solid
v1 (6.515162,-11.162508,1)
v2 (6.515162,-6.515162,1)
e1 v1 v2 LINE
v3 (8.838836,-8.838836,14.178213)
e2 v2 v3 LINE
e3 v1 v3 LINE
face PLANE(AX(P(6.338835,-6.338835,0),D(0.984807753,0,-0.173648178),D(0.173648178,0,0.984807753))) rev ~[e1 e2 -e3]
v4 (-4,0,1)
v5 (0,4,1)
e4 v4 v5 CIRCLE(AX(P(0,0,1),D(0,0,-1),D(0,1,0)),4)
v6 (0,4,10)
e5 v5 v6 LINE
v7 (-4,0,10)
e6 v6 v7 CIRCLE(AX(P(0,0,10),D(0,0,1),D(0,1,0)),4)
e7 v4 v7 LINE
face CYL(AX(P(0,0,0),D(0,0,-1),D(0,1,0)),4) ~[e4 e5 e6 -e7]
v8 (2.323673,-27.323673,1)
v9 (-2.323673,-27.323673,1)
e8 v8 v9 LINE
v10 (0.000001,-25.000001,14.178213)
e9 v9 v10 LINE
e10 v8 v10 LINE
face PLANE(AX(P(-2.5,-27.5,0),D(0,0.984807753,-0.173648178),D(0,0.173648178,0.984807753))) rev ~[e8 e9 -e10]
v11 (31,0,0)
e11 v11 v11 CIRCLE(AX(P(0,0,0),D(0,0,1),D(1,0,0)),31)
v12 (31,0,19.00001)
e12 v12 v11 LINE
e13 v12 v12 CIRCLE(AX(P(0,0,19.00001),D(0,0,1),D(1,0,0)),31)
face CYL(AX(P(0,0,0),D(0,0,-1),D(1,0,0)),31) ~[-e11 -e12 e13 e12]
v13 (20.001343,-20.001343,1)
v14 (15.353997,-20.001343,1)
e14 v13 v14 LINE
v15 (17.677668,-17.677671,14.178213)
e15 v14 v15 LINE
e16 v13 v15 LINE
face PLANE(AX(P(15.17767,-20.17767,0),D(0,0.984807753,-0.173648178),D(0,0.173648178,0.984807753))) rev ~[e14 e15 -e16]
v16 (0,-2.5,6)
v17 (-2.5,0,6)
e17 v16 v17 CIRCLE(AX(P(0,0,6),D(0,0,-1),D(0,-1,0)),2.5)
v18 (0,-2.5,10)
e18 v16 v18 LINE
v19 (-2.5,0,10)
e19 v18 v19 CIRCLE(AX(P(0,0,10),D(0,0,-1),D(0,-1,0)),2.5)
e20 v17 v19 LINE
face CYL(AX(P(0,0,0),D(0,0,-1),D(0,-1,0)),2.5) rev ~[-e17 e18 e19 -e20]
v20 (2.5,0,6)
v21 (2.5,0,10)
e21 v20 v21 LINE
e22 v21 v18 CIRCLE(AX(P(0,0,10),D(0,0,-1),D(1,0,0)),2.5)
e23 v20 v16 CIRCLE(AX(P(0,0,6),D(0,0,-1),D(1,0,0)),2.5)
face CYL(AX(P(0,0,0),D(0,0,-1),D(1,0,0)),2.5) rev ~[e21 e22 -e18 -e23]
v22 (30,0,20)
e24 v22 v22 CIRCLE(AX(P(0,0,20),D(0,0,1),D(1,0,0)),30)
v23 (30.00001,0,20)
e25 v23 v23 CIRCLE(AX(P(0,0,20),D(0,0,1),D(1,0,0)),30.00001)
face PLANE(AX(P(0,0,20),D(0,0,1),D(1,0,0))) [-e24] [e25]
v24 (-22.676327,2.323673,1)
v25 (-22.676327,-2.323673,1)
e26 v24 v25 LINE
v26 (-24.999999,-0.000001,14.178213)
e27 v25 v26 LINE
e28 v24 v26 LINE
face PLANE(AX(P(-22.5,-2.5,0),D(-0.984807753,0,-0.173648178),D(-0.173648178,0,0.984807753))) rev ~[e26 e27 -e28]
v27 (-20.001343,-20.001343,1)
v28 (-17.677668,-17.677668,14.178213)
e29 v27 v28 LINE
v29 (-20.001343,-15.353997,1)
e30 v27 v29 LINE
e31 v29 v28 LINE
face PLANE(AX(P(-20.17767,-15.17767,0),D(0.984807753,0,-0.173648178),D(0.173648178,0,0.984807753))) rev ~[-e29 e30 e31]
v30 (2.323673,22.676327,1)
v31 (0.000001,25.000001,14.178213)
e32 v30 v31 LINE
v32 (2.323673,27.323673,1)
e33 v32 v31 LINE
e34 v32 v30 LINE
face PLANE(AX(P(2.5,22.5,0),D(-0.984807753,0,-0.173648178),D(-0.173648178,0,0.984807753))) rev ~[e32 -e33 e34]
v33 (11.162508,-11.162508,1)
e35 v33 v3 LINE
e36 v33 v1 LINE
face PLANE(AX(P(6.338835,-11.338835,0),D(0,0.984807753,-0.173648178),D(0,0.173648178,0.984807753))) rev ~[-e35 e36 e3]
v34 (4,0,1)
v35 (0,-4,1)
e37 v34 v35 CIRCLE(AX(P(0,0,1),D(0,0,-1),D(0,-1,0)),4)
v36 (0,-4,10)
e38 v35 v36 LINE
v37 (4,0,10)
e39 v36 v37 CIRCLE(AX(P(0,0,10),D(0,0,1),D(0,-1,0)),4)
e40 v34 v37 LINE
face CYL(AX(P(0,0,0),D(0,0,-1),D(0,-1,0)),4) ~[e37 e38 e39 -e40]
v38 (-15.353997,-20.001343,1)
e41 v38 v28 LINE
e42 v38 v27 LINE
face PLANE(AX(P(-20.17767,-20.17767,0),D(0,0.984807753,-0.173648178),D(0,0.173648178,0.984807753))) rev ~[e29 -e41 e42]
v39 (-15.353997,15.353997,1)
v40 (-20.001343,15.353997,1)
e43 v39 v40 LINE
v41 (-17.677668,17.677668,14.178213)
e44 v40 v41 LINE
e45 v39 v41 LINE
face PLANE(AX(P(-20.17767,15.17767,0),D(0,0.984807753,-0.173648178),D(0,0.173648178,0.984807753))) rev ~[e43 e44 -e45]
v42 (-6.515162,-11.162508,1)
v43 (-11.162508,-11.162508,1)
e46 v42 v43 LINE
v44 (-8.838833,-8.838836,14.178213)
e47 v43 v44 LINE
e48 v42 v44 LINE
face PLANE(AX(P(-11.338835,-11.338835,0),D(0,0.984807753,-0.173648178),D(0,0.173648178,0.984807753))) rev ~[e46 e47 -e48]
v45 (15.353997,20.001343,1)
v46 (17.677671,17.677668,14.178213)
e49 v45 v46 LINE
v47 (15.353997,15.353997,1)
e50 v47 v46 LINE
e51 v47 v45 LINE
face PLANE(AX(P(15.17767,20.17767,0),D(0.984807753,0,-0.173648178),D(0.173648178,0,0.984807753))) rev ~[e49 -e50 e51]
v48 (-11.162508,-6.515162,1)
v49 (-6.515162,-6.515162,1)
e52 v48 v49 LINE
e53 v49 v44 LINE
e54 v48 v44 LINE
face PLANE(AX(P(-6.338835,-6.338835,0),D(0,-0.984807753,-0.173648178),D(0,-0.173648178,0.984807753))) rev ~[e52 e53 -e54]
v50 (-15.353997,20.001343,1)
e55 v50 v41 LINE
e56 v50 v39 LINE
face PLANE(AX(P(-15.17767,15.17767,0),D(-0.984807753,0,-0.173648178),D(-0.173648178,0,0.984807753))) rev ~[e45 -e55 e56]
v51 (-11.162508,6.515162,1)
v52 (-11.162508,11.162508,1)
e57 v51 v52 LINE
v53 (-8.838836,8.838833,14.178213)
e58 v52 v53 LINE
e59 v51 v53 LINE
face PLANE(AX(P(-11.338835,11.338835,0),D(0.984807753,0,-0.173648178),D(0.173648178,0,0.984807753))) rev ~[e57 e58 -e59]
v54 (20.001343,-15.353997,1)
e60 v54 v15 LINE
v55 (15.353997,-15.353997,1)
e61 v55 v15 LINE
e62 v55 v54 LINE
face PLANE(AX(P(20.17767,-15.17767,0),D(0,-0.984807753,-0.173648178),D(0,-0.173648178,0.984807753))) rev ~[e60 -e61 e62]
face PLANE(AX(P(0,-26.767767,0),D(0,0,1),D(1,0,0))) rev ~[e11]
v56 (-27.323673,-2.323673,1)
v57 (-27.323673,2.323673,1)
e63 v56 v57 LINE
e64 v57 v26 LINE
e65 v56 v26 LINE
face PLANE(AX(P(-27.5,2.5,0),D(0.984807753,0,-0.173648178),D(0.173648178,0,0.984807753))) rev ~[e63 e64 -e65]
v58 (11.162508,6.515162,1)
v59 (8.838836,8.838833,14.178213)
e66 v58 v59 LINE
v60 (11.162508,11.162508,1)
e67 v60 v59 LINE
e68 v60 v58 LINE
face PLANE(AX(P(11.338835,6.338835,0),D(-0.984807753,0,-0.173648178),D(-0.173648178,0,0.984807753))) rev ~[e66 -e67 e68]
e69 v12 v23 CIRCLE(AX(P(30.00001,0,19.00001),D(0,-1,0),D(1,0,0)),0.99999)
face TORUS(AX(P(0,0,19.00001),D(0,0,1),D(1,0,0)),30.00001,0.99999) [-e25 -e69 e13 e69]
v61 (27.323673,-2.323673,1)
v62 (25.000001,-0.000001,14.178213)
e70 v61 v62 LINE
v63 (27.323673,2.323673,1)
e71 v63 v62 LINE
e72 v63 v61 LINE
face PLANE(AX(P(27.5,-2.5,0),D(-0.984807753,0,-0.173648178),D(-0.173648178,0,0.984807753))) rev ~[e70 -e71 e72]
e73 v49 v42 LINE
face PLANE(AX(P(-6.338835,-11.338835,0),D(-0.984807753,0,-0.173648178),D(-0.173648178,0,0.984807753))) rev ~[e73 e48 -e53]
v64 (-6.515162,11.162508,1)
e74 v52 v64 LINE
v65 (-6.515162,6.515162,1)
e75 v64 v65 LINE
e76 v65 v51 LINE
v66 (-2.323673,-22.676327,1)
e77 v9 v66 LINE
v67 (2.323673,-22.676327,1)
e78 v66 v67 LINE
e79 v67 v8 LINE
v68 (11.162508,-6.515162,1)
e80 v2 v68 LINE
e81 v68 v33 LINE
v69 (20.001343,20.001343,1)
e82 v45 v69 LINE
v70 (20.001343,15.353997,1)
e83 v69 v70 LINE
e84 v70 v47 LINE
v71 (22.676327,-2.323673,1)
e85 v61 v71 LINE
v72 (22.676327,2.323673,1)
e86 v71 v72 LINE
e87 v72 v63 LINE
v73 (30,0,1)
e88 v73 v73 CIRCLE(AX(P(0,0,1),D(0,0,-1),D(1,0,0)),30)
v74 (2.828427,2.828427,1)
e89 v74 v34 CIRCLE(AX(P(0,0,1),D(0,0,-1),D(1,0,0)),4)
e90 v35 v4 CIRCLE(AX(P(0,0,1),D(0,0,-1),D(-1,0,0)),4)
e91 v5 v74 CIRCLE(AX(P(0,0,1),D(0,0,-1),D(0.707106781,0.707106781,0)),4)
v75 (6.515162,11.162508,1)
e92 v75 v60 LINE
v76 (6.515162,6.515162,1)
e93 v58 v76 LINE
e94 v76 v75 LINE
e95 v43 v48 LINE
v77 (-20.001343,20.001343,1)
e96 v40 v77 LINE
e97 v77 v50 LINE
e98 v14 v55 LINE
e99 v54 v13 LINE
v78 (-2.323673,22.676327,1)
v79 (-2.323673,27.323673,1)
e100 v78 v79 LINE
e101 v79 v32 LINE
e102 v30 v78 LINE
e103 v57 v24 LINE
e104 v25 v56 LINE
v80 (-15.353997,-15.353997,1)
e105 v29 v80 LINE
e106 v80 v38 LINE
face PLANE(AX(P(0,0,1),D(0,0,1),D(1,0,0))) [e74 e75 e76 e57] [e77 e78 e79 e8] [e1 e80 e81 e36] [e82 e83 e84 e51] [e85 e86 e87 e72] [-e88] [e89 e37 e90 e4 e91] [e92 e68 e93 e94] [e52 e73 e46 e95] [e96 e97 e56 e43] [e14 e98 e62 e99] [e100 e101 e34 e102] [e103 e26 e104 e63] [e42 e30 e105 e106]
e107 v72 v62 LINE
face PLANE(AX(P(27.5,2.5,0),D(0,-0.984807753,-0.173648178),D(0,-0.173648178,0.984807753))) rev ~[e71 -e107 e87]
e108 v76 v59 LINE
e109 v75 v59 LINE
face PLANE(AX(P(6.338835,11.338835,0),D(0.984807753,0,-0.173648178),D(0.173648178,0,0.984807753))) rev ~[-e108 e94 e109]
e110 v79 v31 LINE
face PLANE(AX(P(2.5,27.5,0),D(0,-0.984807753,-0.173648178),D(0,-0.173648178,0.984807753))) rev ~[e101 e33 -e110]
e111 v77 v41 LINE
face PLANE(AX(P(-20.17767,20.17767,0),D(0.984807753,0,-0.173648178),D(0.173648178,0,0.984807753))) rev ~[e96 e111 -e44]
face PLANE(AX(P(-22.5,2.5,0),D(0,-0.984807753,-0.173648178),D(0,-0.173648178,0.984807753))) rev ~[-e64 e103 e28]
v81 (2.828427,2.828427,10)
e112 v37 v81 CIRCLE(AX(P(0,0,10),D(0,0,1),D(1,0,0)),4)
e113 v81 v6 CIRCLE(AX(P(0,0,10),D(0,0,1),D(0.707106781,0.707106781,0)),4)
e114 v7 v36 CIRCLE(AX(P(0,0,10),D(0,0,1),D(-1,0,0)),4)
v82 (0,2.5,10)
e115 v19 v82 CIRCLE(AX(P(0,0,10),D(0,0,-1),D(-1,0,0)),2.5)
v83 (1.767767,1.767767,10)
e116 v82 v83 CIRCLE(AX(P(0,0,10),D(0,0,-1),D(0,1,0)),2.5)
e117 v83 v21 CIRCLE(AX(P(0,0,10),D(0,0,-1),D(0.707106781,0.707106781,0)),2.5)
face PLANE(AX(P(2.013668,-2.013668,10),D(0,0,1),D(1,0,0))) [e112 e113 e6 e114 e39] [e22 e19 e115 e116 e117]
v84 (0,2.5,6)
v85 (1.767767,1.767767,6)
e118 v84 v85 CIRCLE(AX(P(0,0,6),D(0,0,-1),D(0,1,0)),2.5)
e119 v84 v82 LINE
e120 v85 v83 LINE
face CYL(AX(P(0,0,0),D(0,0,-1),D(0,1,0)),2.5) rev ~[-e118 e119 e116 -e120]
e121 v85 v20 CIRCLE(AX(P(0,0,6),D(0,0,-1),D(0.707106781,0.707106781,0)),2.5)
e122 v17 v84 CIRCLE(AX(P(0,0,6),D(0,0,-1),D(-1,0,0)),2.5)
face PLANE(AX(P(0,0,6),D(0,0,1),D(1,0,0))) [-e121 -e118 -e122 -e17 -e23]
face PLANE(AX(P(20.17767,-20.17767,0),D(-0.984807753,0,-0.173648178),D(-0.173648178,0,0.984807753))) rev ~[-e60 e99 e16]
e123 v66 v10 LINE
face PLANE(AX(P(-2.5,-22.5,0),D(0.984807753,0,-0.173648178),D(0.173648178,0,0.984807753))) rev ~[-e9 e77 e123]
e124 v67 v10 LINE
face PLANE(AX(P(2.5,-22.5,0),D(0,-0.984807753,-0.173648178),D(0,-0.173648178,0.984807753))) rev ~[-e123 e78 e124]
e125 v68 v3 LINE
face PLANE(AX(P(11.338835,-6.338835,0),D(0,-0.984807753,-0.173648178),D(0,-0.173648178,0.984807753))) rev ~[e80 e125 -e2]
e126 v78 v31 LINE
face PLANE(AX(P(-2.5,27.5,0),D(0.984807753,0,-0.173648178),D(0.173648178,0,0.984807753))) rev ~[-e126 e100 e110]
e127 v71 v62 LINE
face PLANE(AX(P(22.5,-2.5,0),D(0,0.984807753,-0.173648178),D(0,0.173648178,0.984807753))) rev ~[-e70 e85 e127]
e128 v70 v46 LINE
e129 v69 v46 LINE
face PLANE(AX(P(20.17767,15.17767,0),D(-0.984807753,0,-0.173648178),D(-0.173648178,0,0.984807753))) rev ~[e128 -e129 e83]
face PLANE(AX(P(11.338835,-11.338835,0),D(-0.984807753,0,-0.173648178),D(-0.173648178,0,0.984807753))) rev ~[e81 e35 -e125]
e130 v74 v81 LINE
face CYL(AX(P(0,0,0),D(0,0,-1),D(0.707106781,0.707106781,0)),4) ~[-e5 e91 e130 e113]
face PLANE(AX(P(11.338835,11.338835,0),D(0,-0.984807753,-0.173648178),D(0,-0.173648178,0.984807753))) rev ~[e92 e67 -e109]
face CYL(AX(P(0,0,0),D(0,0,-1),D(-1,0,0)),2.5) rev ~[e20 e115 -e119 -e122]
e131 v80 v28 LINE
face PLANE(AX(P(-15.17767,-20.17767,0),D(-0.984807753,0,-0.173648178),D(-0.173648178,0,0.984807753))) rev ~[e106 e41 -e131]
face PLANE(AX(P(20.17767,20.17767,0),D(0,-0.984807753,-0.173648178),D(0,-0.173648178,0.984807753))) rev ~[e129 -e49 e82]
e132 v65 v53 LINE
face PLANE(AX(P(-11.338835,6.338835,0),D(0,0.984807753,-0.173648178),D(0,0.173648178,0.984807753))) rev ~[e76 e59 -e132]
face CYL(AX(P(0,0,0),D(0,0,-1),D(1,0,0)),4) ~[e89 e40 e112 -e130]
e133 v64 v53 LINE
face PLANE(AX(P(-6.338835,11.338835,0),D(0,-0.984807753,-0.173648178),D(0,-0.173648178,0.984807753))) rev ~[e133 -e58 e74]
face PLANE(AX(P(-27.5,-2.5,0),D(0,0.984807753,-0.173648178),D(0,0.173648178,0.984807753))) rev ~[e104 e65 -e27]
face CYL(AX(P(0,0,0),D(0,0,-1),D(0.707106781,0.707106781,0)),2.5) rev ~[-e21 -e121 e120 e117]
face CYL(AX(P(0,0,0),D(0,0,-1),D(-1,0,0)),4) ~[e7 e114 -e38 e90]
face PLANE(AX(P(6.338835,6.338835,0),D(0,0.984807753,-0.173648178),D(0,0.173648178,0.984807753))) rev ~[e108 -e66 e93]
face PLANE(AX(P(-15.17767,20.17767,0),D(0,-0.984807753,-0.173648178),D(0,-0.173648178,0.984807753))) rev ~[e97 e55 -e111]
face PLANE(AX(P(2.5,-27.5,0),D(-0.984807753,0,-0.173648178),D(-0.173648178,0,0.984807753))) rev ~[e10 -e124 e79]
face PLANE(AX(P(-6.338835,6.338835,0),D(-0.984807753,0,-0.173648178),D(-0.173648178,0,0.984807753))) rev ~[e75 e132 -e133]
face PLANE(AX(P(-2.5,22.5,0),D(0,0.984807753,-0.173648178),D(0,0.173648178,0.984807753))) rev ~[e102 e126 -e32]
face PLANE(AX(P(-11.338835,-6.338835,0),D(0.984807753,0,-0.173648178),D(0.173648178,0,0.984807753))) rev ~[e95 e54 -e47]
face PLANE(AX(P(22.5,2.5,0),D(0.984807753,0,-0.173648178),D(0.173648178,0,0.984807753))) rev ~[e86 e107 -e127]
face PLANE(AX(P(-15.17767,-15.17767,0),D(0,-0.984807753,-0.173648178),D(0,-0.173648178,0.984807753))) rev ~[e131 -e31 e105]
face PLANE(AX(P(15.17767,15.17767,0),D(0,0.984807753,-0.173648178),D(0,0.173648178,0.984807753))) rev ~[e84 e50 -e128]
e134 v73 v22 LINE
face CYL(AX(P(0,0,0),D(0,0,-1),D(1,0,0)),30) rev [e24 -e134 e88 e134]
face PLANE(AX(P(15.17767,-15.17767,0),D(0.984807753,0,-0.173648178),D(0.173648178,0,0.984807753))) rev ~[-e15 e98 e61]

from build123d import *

# Parameters (mm, degrees)
F0_R     = 31
F0_R_2   = 30
F0_W     = 5
F0_H     = 5
F1_DEPTH = 1
F2_DEPTH = 20
F3_DEPTH = 10
F4_DEPTH = 15
F4_TAPER = 10
F5_R     = 0.99999
F6_DEPTH = 5


# Not quite as in the source:
# - a fillet or chamfer is up to 0.001 mm smaller than in the source, because OpenCascade refuses the exact size


with BuildPart() as f1:
    # F0 (on Top) → F1 (new body)
    with BuildSketch(Plane.XY):
        Circle(F0_R)
        Circle(F0_R_2, mode=Mode.SUBTRACT)
        Circle(F0_R_2)
        with Locations((-17.6776695297, -17.6776695297)):
            Rectangle(F0_W, F0_H, mode=Mode.SUBTRACT)
        Polygon((-2.5, -22.5), (0, -22.5), (2.5, -22.5), (2.5, -27.5), (-2.5, -27.5), align=None, mode=Mode.SUBTRACT)
        with Locations((17.6776695297, -17.6776695297)):
            Rectangle(F0_W, F0_H, mode=Mode.SUBTRACT)
        Polygon((-22.5, 2.5), (-22.5, 0), (-22.5, -2.5), (-27.5, -2.5), (-27.5, 2.5), align=None, mode=Mode.SUBTRACT)
        with Locations((-17.6776695297, 17.6776695297)):
            Rectangle(F0_W, F0_H, mode=Mode.SUBTRACT)
        with BuildLine():
            ThreePointArc((-15.1776695297, 15.1776695297), (-8.2140955588, 19.8305809006), (0, 21.4644660941))
            ThreePointArc((0, 21.4644660941), (8.2140955588, 19.8305809006), (15.1776695297, 15.1776695297))
            ThreePointArc((15.1776695297, 15.1776695297), (19.8305809006, 8.2140955588), (21.4644660941, 0))
            ThreePointArc((21.4644660941, 0), (19.8305809006, -8.2140955588), (15.1776695297, -15.1776695297))
            ThreePointArc((15.1776695297, -15.1776695297), (8.2140955588, -19.8305809006), (0, -21.4644660941))
            ThreePointArc((0, -21.4644660941), (-8.2140955588, -19.8305809006), (-15.1776695297, -15.1776695297))
            ThreePointArc((-15.1776695297, -15.1776695297), (-19.8305809006, -8.2140955588), (-21.4644660941, 0))
            ThreePointArc((-21.4644660941, 0), (-19.8305809006, 8.2140955588), (-15.1776695297, 15.1776695297))
        make_face(mode=Mode.SUBTRACT)
        Polygon((22.5, -2.5), (22.5, 0), (22.5, 2.5), (27.5, 2.5), (27.5, -2.5), align=None, mode=Mode.SUBTRACT)
        Polygon((2.5, 22.5), (0, 22.5), (-2.5, 22.5), (-2.5, 27.5), (2.5, 27.5), align=None, mode=Mode.SUBTRACT)
        with Locations((17.6776695297, 17.6776695297)):
            Rectangle(F0_W, F0_H, mode=Mode.SUBTRACT)
        with BuildLine():
            Line((0, 21.4644660941), (0, 12.5))
            ThreePointArc((0, 12.5), (3.2848701936, 12.0606644847), (6.3388347648, 10.7735404498))
            Line((6.3388347648, 10.7735404498), (6.3388347648, 11.3388347648))
            Line((6.3388347648, 11.3388347648), (11.3388347648, 11.3388347648))
            Line((11.3388347648, 11.3388347648), (15.1776695297, 15.1776695297))
            ThreePointArc((15.1776695297, 15.1776695297), (8.2140955588, 19.8305809006), (0, 21.4644660941))
        make_face()
        with BuildLine():
            ThreePointArc((10.7735404498, 6.3388347648), (12.0606644847, 3.2848701936), (12.5, 0))
            Line((12.5, 0), (21.4644660941, 0))
            ThreePointArc((21.4644660941, 0), (19.8305809006, 8.2140955588), (15.1776695297, 15.1776695297))
            Line((15.1776695297, 15.1776695297), (11.3388347648, 11.3388347648))
            Line((11.3388347648, 11.3388347648), (11.3388347648, 6.3388347648))
            Line((11.3388347648, 6.3388347648), (10.7735404498, 6.3388347648))
        make_face()
        with BuildLine():
            ThreePointArc((6.3388347648, -10.7735404498), (3.2848701936, -12.0606644847), (0, -12.5))
            Line((0, -12.5), (0, -21.4644660941))
            ThreePointArc((0, -21.4644660941), (8.2140955588, -19.8305809006), (15.1776695297, -15.1776695297))
            ThreePointArc((15.1776695297, -15.1776695297), (19.8305809006, -8.2140955588), (21.4644660941, 0))
            Line((21.4644660941, 0), (12.5, 0))
            ThreePointArc((12.5, 0), (12.0606644847, -3.2848701936), (10.7735404498, -6.3388347648))
            Line((10.7735404498, -6.3388347648), (11.3388347648, -6.3388347648))
            Line((11.3388347648, -6.3388347648), (11.3388347648, -11.3388347648))
            Line((11.3388347648, -11.3388347648), (6.3388347648, -11.3388347648))
            Line((6.3388347648, -11.3388347648), (6.3388347648, -10.7735404498))
        make_face()
        with BuildLine():
            Line((0, -21.4644660941), (0, -12.5))
            ThreePointArc((0, -12.5), (-3.2848701936, -12.0606644847), (-6.3388347648, -10.7735404498))
            Line((-6.3388347648, -10.7735404498), (-6.3388347648, -11.3388347648))
            Line((-6.3388347648, -11.3388347648), (-11.3388347648, -11.3388347648))
            Line((-11.3388347648, -11.3388347648), (-11.3388347648, -6.3388347648))
            Line((-11.3388347648, -6.3388347648), (-10.7735404498, -6.3388347648))
            ThreePointArc((-10.7735404498, -6.3388347648), (-12.0606644847, -3.2848701936), (-12.5, 0))
            Line((-12.5, 0), (-21.4644660941, 0))
            ThreePointArc((-21.4644660941, 0), (-19.8305809006, -8.2140955588), (-15.1776695297, -15.1776695297))
            ThreePointArc((-15.1776695297, -15.1776695297), (-8.2140955588, -19.8305809006), (0, -21.4644660941))
        make_face()
        with BuildLine():
            ThreePointArc((-6.3388347648, 10.7735404498), (-3.2848701936, 12.0606644847), (0, 12.5))
            Line((0, 12.5), (0, 21.4644660941))
            ThreePointArc((0, 21.4644660941), (-8.2140955588, 19.8305809006), (-15.1776695297, 15.1776695297))
            ThreePointArc((-15.1776695297, 15.1776695297), (-19.8305809006, 8.2140955588), (-21.4644660941, 0))
            Line((-21.4644660941, 0), (-12.5, 0))
            ThreePointArc((-12.5, 0), (-12.0606644847, 3.2848701936), (-10.7735404498, 6.3388347648))
            Line((-10.7735404498, 6.3388347648), (-11.3388347648, 6.3388347648))
            Line((-11.3388347648, 6.3388347648), (-11.3388347648, 11.3388347648))
            Line((-11.3388347648, 11.3388347648), (-6.3388347648, 11.3388347648))
            Line((-6.3388347648, 11.3388347648), (-6.3388347648, 10.7735404498))
        make_face()
        with BuildLine():
            Line((0, 12.5), (0, 4))
            ThreePointArc((0, 4), (1.5307337295, 3.69551813), (2.8284271247, 2.8284271247))
            Line((2.8284271247, 2.8284271247), (6.3388347648, 6.3388347648))
            Line((6.3388347648, 6.3388347648), (6.3388347648, 10.7735404498))
            ThreePointArc((6.3388347648, 10.7735404498), (3.2848701936, 12.0606644847), (0, 12.5))
        make_face()
        with BuildLine():
            ThreePointArc((-4, 0), (-2.8284271247, 2.8284271247), (0, 4))
            Line((0, 4), (0, 12.5))
            ThreePointArc((0, 12.5), (-3.2848701936, 12.0606644847), (-6.3388347648, 10.7735404498))
            Line((-6.3388347648, 10.7735404498), (-6.3388347648, 6.3388347648))
            Line((-6.3388347648, 6.3388347648), (-10.7735404498, 6.3388347648))
            ThreePointArc((-10.7735404498, 6.3388347648), (-12.0606644847, 3.2848701936), (-12.5, 0))
            Line((-12.5, 0), (-4, 0))
        make_face()
        with BuildLine():
            ThreePointArc((2.8284271247, 2.8284271247), (3.69551813, 1.5307337295), (4, 0))
            Line((4, 0), (12.5, 0))
            ThreePointArc((12.5, 0), (12.0606644847, 3.2848701936), (10.7735404498, 6.3388347648))
            Line((10.7735404498, 6.3388347648), (6.3388347648, 6.3388347648))
            Line((6.3388347648, 6.3388347648), (2.8284271247, 2.8284271247))
        make_face()
        with BuildLine():
            ThreePointArc((4, 0), (2.8284271247, -2.8284271247), (0, -4))
            Line((0, -4), (0, -12.5))
            ThreePointArc((0, -12.5), (3.2848701936, -12.0606644847), (6.3388347648, -10.7735404498))
            Line((6.3388347648, -10.7735404498), (6.3388347648, -6.3388347648))
            Line((6.3388347648, -6.3388347648), (10.7735404498, -6.3388347648))
            ThreePointArc((10.7735404498, -6.3388347648), (12.0606644847, -3.2848701936), (12.5, 0))
            Line((12.5, 0), (4, 0))
        make_face()
        with BuildLine():
            Line((0, -12.5), (0, -4))
            ThreePointArc((0, -4), (-2.8284271247, -2.8284271247), (-4, 0))
            Line((-4, 0), (-12.5, 0))
            ThreePointArc((-12.5, 0), (-12.0606644847, -3.2848701936), (-10.7735404498, -6.3388347648))
            Line((-10.7735404498, -6.3388347648), (-6.3388347648, -6.3388347648))
            Line((-6.3388347648, -6.3388347648), (-6.3388347648, -10.7735404498))
            ThreePointArc((-6.3388347648, -10.7735404498), (-3.2848701936, -12.0606644847), (0, -12.5))
        make_face()
        Polygon((22.5, 2.5), (25, 0), (27.5, 2.5), align=None)
        Polygon((27.5, 2.5), (25, 0), (27.5, -2.5), align=None)
        Polygon((27.5, -2.5), (25, 0), (22.5, -2.5), align=None)
        Polygon((25, 0), (22.5, 0), (22.5, -2.5), align=None)
        Polygon((22.5, 2.5), (22.5, 0), (25, 0), align=None)
        Polygon((17.6776695297, 17.6776695297), (15.1776695297, 15.1776695297), (20.1776695297, 15.1776695297), align=None)
        Polygon((15.1776695297, 20.1776695297), (17.6776695297, 17.6776695297), (20.1776695297, 20.1776695297), align=None)
        Polygon((20.1776695297, 20.1776695297), (17.6776695297, 17.6776695297), (20.1776695297, 15.1776695297), align=None)
        Polygon((15.1776695297, 20.1776695297), (15.1776695297, 15.1776695297), (17.6776695297, 17.6776695297), align=None)
        Polygon((-2.5, 27.5), (0, 25), (2.5, 27.5), align=None)
        Polygon((2.5, 27.5), (0, 25), (2.5, 22.5), align=None)
        Polygon((-2.5, 22.5), (0, 22.5), (0, 25), align=None)
        Polygon((0, 25), (0, 22.5), (2.5, 22.5), align=None)
        Polygon((-2.5, 22.5), (0, 25), (-2.5, 27.5), align=None)
        Polygon((-17.6776695297, 17.6776695297), (-15.1776695297, 20.1776695297), (-20.1776695297, 20.1776695297), align=None)
        Polygon((-17.6776695297, 17.6776695297), (-15.1776695297, 15.1776695297), (-15.1776695297, 20.1776695297), align=None)
        Polygon((-20.1776695297, 15.1776695297), (-15.1776695297, 15.1776695297), (-17.6776695297, 17.6776695297), align=None)
        Polygon((-20.1776695297, 20.1776695297), (-20.1776695297, 15.1776695297), (-17.6776695297, 17.6776695297), align=None)
        Polygon((-8.8388347762, 8.8388347535), (-6.3388347648, 11.3388347648), (-11.3388347648, 11.3388347648), align=None)
        Polygon((-11.3388347648, 6.3388347648), (-8.8388347762, 8.8388347535), (-11.3388347648, 11.3388347648), align=None)
        with BuildLine():
            ThreePointArc((-8.8388347762, 8.8388347535), (-9.8855356702, 7.650240814), (-10.7735404498, 6.3388347648))
            Line((-10.7735404498, 6.3388347648), (-6.3388347648, 6.3388347648))
            Line((-6.3388347648, 6.3388347648), (-8.8388347648, 8.8388347648))
        make_face()
        with BuildLine():
            Line((-6.3388347648, 6.3388347648), (-6.3388347648, 10.7735404498))
            ThreePointArc((-6.3388347648, 10.7735404498), (-7.6502408267, 9.8855356604), (-8.8388347762, 8.8388347535))
            Line((-8.8388347648, 8.8388347648), (-6.3388347648, 6.3388347648))
        make_face()
        with BuildLine():
            Line((6.3388347648, 10.7735404498), (6.3388347648, 6.3388347648))
            Line((6.3388347648, 6.3388347648), (8.8388347648, 8.8388347648))
            ThreePointArc((8.8388347535, 8.8388347762), (7.650240814, 9.8855356702), (6.3388347648, 10.7735404498))
        make_face()
        Polygon((6.3388347648, 11.3388347648), (8.8388347535, 8.8388347762), (11.3388347648, 11.3388347648), align=None)
        Polygon((11.3388347648, 11.3388347648), (8.8388347648, 8.8388347648), (11.3388347648, 6.3388347648), align=None)
        with BuildLine():
            Line((8.8388347648, 8.8388347648), (6.3388347648, 6.3388347648))
            Line((6.3388347648, 6.3388347648), (10.7735404498, 6.3388347648))
            ThreePointArc((10.7735404498, 6.3388347648), (9.8855356604, 7.6502408267), (8.8388347535, 8.8388347762))
        make_face()
        with BuildLine():
            ThreePointArc((8.8388347578, -8.8388347719), (9.8855356623, -7.6502408243), (10.7735404498, -6.3388347648))
            Line((10.7735404498, -6.3388347648), (6.3388347648, -6.3388347648))
            Line((6.3388347648, -6.3388347648), (8.8388347648, -8.8388347648))
        make_face()
        Polygon((11.3388347648, -6.3388347648), (8.8388347578, -8.8388347719), (11.3388347648, -11.3388347648), align=None)
        Polygon((8.8388347578, -8.8388347719), (6.3388347648, -11.3388347648), (11.3388347648, -11.3388347648), align=None)
        with BuildLine():
            Line((6.3388347648, -6.3388347648), (6.3388347648, -10.7735404498))
            ThreePointArc((6.3388347648, -10.7735404498), (7.6502408164, -9.8855356684), (8.8388347578, -8.8388347719))
            Line((8.8388347648, -8.8388347648), (6.3388347648, -6.3388347648))
        make_face()
        with BuildLine():
            Line((-6.3388347648, -6.3388347648), (-10.7735404498, -6.3388347648))
            ThreePointArc((-10.7735404498, -6.3388347648), (-9.8855356524, -7.650240837), (-8.838834735, -8.8388347946))
            Line((-8.8388347648, -8.8388347648), (-6.3388347648, -6.3388347648))
        make_face()
        with BuildLine():
            ThreePointArc((-8.838834735, -8.8388347946), (-7.6502408037, -9.8855356782), (-6.3388347648, -10.7735404498))
            Line((-6.3388347648, -10.7735404498), (-6.3388347648, -6.3388347648))
            Line((-6.3388347648, -6.3388347648), (-8.8388347648, -8.8388347648))
        make_face()
        Polygon((-11.3388347648, -11.3388347648), (-6.3388347648, -11.3388347648), (-8.838834735, -8.8388347946), align=None)
        Polygon((-27.5, 2.5), (-25, 0), (-22.5, 2.5), align=None)
        Polygon((-25, 0), (-22.5, 0), (-22.5, 2.5), align=None)
        Polygon((-22.5, -2.5), (-22.5, 0), (-25, 0), align=None)
        Polygon((-22.5, -2.5), (-25, 0), (-27.5, -2.5), align=None)
        Polygon((-27.5, -2.5), (-25, 0), (-27.5, 2.5), align=None)
        with BuildLine():
            ThreePointArc((-2.5, 0), (-1.767766953, 1.767766953), (0, 2.5))
            Line((0, 2.5), (0, 4))
            ThreePointArc((0, 4), (-2.8284271247, 2.8284271247), (-4, 0))
            Line((-4, 0), (-2.5, 0))
        make_face()
        with BuildLine():
            ThreePointArc((2.5, 0), (1.767766953, -1.767766953), (0, -2.5))
            Line((0, -2.5), (0, -4))
            ThreePointArc((0, -4), (2.8284271247, -2.8284271247), (4, 0))
            Line((4, 0), (2.5, 0))
        make_face()
        with BuildLine():
            Line((0, -4), (0, -2.5))
            ThreePointArc((0, -2.5), (-1.767766953, -1.767766953), (-2.5, 0))
            Line((-2.5, 0), (-4, 0))
            ThreePointArc((-4, 0), (-2.8284271247, -2.8284271247), (0, -4))
        make_face()
        with BuildLine():
            ThreePointArc((1.767766953, 1.767766953), (2.3096988313, 0.9567085809), (2.5, 0))
            Line((2.5, 0), (4, 0))
            ThreePointArc((4, 0), (3.69551813, 1.5307337295), (2.8284271247, 2.8284271247))
            Line((2.8284271247, 2.8284271247), (1.767766953, 1.767766953))
        make_face()
        with BuildLine():
            Line((0, 4), (0, 2.5))
            ThreePointArc((0, 2.5), (0.9567085809, 2.3096988313), (1.767766953, 1.767766953))
            Line((1.767766953, 1.767766953), (2.8284271247, 2.8284271247))
            ThreePointArc((2.8284271247, 2.8284271247), (1.5307337295, 3.69551813), (0, 4))
        make_face()
        Polygon((-11.3388347648, -11.3388347648), (-8.8388347648, -8.8388347648), (-11.3388347648, -6.3388347648), align=None)
        Polygon((-17.6776695297, -17.6776695297), (-15.1776695297, -15.1776695297), (-20.1776695297, -15.1776695297), align=None)
        Polygon((-15.1776695297, -20.1776695297), (-15.1776695297, -15.1776695297), (-17.6776695297, -17.6776695297), align=None)
        Polygon((-20.1776695297, -20.1776695297), (-15.1776695297, -20.1776695297), (-17.6776695297, -17.6776695297), align=None)
        Polygon((-17.6776695297, -17.6776695297), (-20.1776695297, -15.1776695297), (-20.1776695297, -20.1776695297), align=None)
        Polygon((20.1776695297, -15.1776695297), (15.1776695297, -15.1776695297), (17.6776695297, -17.6776695297), align=None)
        Polygon((20.1776695297, -20.1776695297), (20.1776695297, -15.1776695297), (17.6776695297, -17.6776695297), align=None)
        Polygon((17.6776695297, -17.6776695297), (15.1776695297, -20.1776695297), (20.1776695297, -20.1776695297), align=None)
        Polygon((17.6776695297, -17.6776695297), (15.1776695297, -15.1776695297), (15.1776695297, -20.1776695297), align=None)
        Polygon((2.5, -22.5), (0, -25), (2.5, -27.5), align=None)
        Polygon((2.5, -27.5), (0, -25), (-2.5, -27.5), align=None)
        Polygon((-2.5, -27.5), (0, -25), (-2.5, -22.5), align=None)
        Polygon((0, -25), (0, -22.5), (-2.5, -22.5), align=None)
        Polygon((2.5, -22.5), (0, -22.5), (0, -25), align=None)
        with BuildLine():
            Line((11.3388347648, -6.3388347648), (10.7735404498, -6.3388347648))
            ThreePointArc((10.7735404498, -6.3388347648), (9.8855356623, -7.6502408243), (8.8388347578, -8.8388347719))
            Line((8.8388347578, -8.8388347719), (11.3388347648, -6.3388347648))
        make_face()
        with BuildLine():
            ThreePointArc((8.8388347578, -8.8388347719), (7.6502408164, -9.8855356684), (6.3388347648, -10.7735404498))
            Line((6.3388347648, -10.7735404498), (6.3388347648, -11.3388347648))
            Line((6.3388347648, -11.3388347648), (8.8388347578, -8.8388347719))
        make_face()
        with BuildLine():
            Line((-6.3388347648, -11.3388347648), (-6.3388347648, -10.7735404498))
            ThreePointArc((-6.3388347648, -10.7735404498), (-7.6502408037, -9.8855356782), (-8.838834735, -8.8388347946))
            Line((-8.838834735, -8.8388347946), (-6.3388347648, -11.3388347648))
        make_face()
        with BuildLine():
            ThreePointArc((-8.838834735, -8.8388347946), (-9.8855356524, -7.650240837), (-10.7735404498, -6.3388347648))
            Line((-10.7735404498, -6.3388347648), (-11.3388347648, -6.3388347648))
            Line((-11.3388347648, -6.3388347648), (-8.838834735, -8.8388347946))
        make_face()
        with BuildLine():
            ThreePointArc((8.8388347535, 8.8388347762), (9.8855356604, 7.6502408267), (10.7735404498, 6.3388347648))
            Line((10.7735404498, 6.3388347648), (11.3388347648, 6.3388347648))
            Line((11.3388347648, 6.3388347648), (8.8388347535, 8.8388347762))
        make_face()
        with BuildLine():
            Line((6.3388347648, 11.3388347648), (6.3388347648, 10.7735404498))
            ThreePointArc((6.3388347648, 10.7735404498), (7.650240814, 9.8855356702), (8.8388347535, 8.8388347762))
            Line((8.8388347535, 8.8388347762), (6.3388347648, 11.3388347648))
        make_face()
        with BuildLine():
            ThreePointArc((-8.8388347762, 8.8388347535), (-7.6502408267, 9.8855356604), (-6.3388347648, 10.7735404498))
            Line((-6.3388347648, 10.7735404498), (-6.3388347648, 11.3388347648))
            Line((-6.3388347648, 11.3388347648), (-8.8388347762, 8.8388347535))
        make_face()
        with BuildLine():
            Line((-11.3388347648, 6.3388347648), (-10.7735404498, 6.3388347648))
            ThreePointArc((-10.7735404498, 6.3388347648), (-9.8855356702, 7.650240814), (-8.8388347762, 8.8388347535))
            Line((-8.8388347762, 8.8388347535), (-11.3388347648, 6.3388347648))
        make_face()
        with BuildLine():
            Line((0, 2.5), (0, 0))
            Line((0, 0), (1.767766953, 1.767766953))
            ThreePointArc((1.767766953, 1.767766953), (0.9567085809, 2.3096988313), (0, 2.5))
        make_face()
        with BuildLine():
            Line((1.767766953, 1.767766953), (0, 0))
            Line((0, 0), (2.5, 0))
            ThreePointArc((2.5, 0), (2.3096988313, 0.9567085809), (1.767766953, 1.767766953))
        make_face()
        with BuildLine():
            Line((2.5, 0), (0, 0))
            Line((0, 0), (0, -2.5))
            ThreePointArc((0, -2.5), (1.767766953, -1.767766953), (2.5, 0))
        make_face()
        with BuildLine():
            Line((0, -2.5), (0, 0))
            Line((0, 0), (-2.5, 0))
            ThreePointArc((-2.5, 0), (-1.767766953, -1.767766953), (0, -2.5))
        make_face()
        with BuildLine():
            Line((-2.5, 0), (0, 0))
            Line((0, 0), (0, 2.5))
            ThreePointArc((0, 2.5), (-1.767766953, 1.767766953), (-2.5, 0))
        make_face()
    extrude(amount=F1_DEPTH)

    # F0 (on Top) → F2 (join)
    with BuildSketch(Plane.XY):
        Circle(F0_R)
        Circle(F0_R_2, mode=Mode.SUBTRACT)
    extrude(amount=F2_DEPTH)

    # F0 (on Top) → F3 (join)
    with BuildSketch(Plane.XY):
        with BuildLine():
            ThreePointArc((2.5, 0), (1.767766953, -1.767766953), (0, -2.5))
            Line((0, -2.5), (0, -4))
            ThreePointArc((0, -4), (2.8284271247, -2.8284271247), (4, 0))
            Line((4, 0), (2.5, 0))
        make_face()
        with BuildLine():
            ThreePointArc((1.767766953, 1.767766953), (2.3096988313, 0.9567085809), (2.5, 0))
            Line((2.5, 0), (4, 0))
            ThreePointArc((4, 0), (3.69551813, 1.5307337295), (2.8284271247, 2.8284271247))
            Line((2.8284271247, 2.8284271247), (1.767766953, 1.767766953))
        make_face()
        with BuildLine():
            Line((0, 4), (0, 2.5))
            ThreePointArc((0, 2.5), (0.9567085809, 2.3096988313), (1.767766953, 1.767766953))
            Line((1.767766953, 1.767766953), (2.8284271247, 2.8284271247))
            ThreePointArc((2.8284271247, 2.8284271247), (1.5307337295, 3.69551813), (0, 4))
        make_face()
        with BuildLine():
            ThreePointArc((-2.5, 0), (-1.767766953, 1.767766953), (0, 2.5))
            Line((0, 2.5), (0, 4))
            ThreePointArc((0, 4), (-2.8284271247, 2.8284271247), (-4, 0))
            Line((-4, 0), (-2.5, 0))
        make_face()
        with BuildLine():
            Line((0, -4), (0, -2.5))
            ThreePointArc((0, -2.5), (-1.767766953, -1.767766953), (-2.5, 0))
            Line((-2.5, 0), (-4, 0))
            ThreePointArc((-4, 0), (-2.8284271247, -2.8284271247), (0, -4))
        make_face()
    extrude(amount=F3_DEPTH)

    # F0 (on Top) → F4 (join)
    with BuildSketch(Plane.XY):
        Polygon((2.5, -27.5), (0, -25), (-2.5, -27.5), align=None)
        Polygon((2.5, -22.5), (0, -25), (2.5, -27.5), align=None)
        Polygon((2.5, -22.5), (0, -22.5), (0, -25), align=None)
        Polygon((0, -25), (0, -22.5), (-2.5, -22.5), align=None)
        Polygon((-2.5, -27.5), (0, -25), (-2.5, -22.5), align=None)
        Polygon((17.6776695297, -17.6776695297), (15.1776695297, -15.1776695297), (15.1776695297, -20.1776695297), align=None)
        Polygon((17.6776695297, -17.6776695297), (15.1776695297, -20.1776695297), (20.1776695297, -20.1776695297), align=None)
        Polygon((20.1776695297, -20.1776695297), (20.1776695297, -15.1776695297), (17.6776695297, -17.6776695297), align=None)
        Polygon((20.1776695297, -15.1776695297), (15.1776695297, -15.1776695297), (17.6776695297, -17.6776695297), align=None)
        Polygon((8.8388347578, -8.8388347719), (6.3388347648, -11.3388347648), (11.3388347648, -11.3388347648), align=None)
        with BuildLine():
            Line((6.3388347648, -6.3388347648), (6.3388347648, -10.7735404498))
            ThreePointArc((6.3388347648, -10.7735404498), (7.6502408164, -9.8855356684), (8.8388347578, -8.8388347719))
            Line((8.8388347648, -8.8388347648), (6.3388347648, -6.3388347648))
        make_face()
        Polygon((11.3388347648, -6.3388347648), (8.8388347578, -8.8388347719), (11.3388347648, -11.3388347648), align=None)
        with BuildLine():
            ThreePointArc((8.8388347578, -8.8388347719), (9.8855356623, -7.6502408243), (10.7735404498, -6.3388347648))
            Line((10.7735404498, -6.3388347648), (6.3388347648, -6.3388347648))
            Line((6.3388347648, -6.3388347648), (8.8388347648, -8.8388347648))
        make_face()
        with BuildLine():
            Line((11.3388347648, -6.3388347648), (10.7735404498, -6.3388347648))
            ThreePointArc((10.7735404498, -6.3388347648), (9.8855356623, -7.6502408243), (8.8388347578, -8.8388347719))
            Line((8.8388347578, -8.8388347719), (11.3388347648, -6.3388347648))
        make_face()
        with BuildLine():
            ThreePointArc((8.8388347578, -8.8388347719), (7.6502408164, -9.8855356684), (6.3388347648, -10.7735404498))
            Line((6.3388347648, -10.7735404498), (6.3388347648, -11.3388347648))
            Line((6.3388347648, -11.3388347648), (8.8388347578, -8.8388347719))
        make_face()
        Polygon((-11.3388347648, -11.3388347648), (-6.3388347648, -11.3388347648), (-8.838834735, -8.8388347946), align=None)
        with BuildLine():
            ThreePointArc((-8.838834735, -8.8388347946), (-7.6502408037, -9.8855356782), (-6.3388347648, -10.7735404498))
            Line((-6.3388347648, -10.7735404498), (-6.3388347648, -6.3388347648))
            Line((-6.3388347648, -6.3388347648), (-8.8388347648, -8.8388347648))
        make_face()
        with BuildLine():
            Line((-6.3388347648, -6.3388347648), (-10.7735404498, -6.3388347648))
            ThreePointArc((-10.7735404498, -6.3388347648), (-9.8855356524, -7.650240837), (-8.838834735, -8.8388347946))
            Line((-8.8388347648, -8.8388347648), (-6.3388347648, -6.3388347648))
        make_face()
        Polygon((-11.3388347648, -11.3388347648), (-8.8388347648, -8.8388347648), (-11.3388347648, -6.3388347648), align=None)
        with BuildLine():
            Line((-6.3388347648, -11.3388347648), (-6.3388347648, -10.7735404498))
            ThreePointArc((-6.3388347648, -10.7735404498), (-7.6502408037, -9.8855356782), (-8.838834735, -8.8388347946))
            Line((-8.838834735, -8.8388347946), (-6.3388347648, -11.3388347648))
        make_face()
        with BuildLine():
            ThreePointArc((-8.838834735, -8.8388347946), (-9.8855356524, -7.650240837), (-10.7735404498, -6.3388347648))
            Line((-10.7735404498, -6.3388347648), (-11.3388347648, -6.3388347648))
            Line((-11.3388347648, -6.3388347648), (-8.838834735, -8.8388347946))
        make_face()
        Polygon((-15.1776695297, -20.1776695297), (-15.1776695297, -15.1776695297), (-17.6776695297, -17.6776695297), align=None)
        Polygon((-20.1776695297, -20.1776695297), (-15.1776695297, -20.1776695297), (-17.6776695297, -17.6776695297), align=None)
        Polygon((-17.6776695297, -17.6776695297), (-20.1776695297, -15.1776695297), (-20.1776695297, -20.1776695297), align=None)
        Polygon((-17.6776695297, -17.6776695297), (-15.1776695297, -15.1776695297), (-20.1776695297, -15.1776695297), align=None)
        Polygon((-22.5, -2.5), (-25, 0), (-27.5, -2.5), align=None)
        Polygon((-22.5, -2.5), (-22.5, 0), (-25, 0), align=None)
        Polygon((-25, 0), (-22.5, 0), (-22.5, 2.5), align=None)
        Polygon((-27.5, 2.5), (-25, 0), (-22.5, 2.5), align=None)
        Polygon((-27.5, -2.5), (-25, 0), (-27.5, 2.5), align=None)
        Polygon((27.5, -2.5), (25, 0), (22.5, -2.5), align=None)
        Polygon((27.5, 2.5), (25, 0), (27.5, -2.5), align=None)
        Polygon((25, 0), (22.5, 0), (22.5, -2.5), align=None)
        Polygon((22.5, 2.5), (22.5, 0), (25, 0), align=None)
        Polygon((22.5, 2.5), (25, 0), (27.5, 2.5), align=None)
        with BuildLine():
            Line((6.3388347648, 10.7735404498), (6.3388347648, 6.3388347648))
            Line((6.3388347648, 6.3388347648), (8.8388347648, 8.8388347648))
            ThreePointArc((8.8388347535, 8.8388347762), (7.650240814, 9.8855356702), (6.3388347648, 10.7735404498))
        make_face()
        Polygon((11.3388347648, 11.3388347648), (8.8388347648, 8.8388347648), (11.3388347648, 6.3388347648), align=None)
        with BuildLine():
            Line((8.8388347648, 8.8388347648), (6.3388347648, 6.3388347648))
            Line((6.3388347648, 6.3388347648), (10.7735404498, 6.3388347648))
            ThreePointArc((10.7735404498, 6.3388347648), (9.8855356604, 7.6502408267), (8.8388347535, 8.8388347762))
        make_face()
        Polygon((6.3388347648, 11.3388347648), (8.8388347535, 8.8388347762), (11.3388347648, 11.3388347648), align=None)
        with BuildLine():
            ThreePointArc((8.8388347535, 8.8388347762), (9.8855356604, 7.6502408267), (10.7735404498, 6.3388347648))
            Line((10.7735404498, 6.3388347648), (11.3388347648, 6.3388347648))
            Line((11.3388347648, 6.3388347648), (8.8388347535, 8.8388347762))
        make_face()
        with BuildLine():
            Line((6.3388347648, 11.3388347648), (6.3388347648, 10.7735404498))
            ThreePointArc((6.3388347648, 10.7735404498), (7.650240814, 9.8855356702), (8.8388347535, 8.8388347762))
            Line((8.8388347535, 8.8388347762), (6.3388347648, 11.3388347648))
        make_face()
        with BuildLine():
            ThreePointArc((-8.8388347762, 8.8388347535), (-9.8855356702, 7.650240814), (-10.7735404498, 6.3388347648))
            Line((-10.7735404498, 6.3388347648), (-6.3388347648, 6.3388347648))
            Line((-6.3388347648, 6.3388347648), (-8.8388347648, 8.8388347648))
        make_face()
        with BuildLine():
            Line((-11.3388347648, 6.3388347648), (-10.7735404498, 6.3388347648))
            ThreePointArc((-10.7735404498, 6.3388347648), (-9.8855356702, 7.650240814), (-8.8388347762, 8.8388347535))
            Line((-8.8388347762, 8.8388347535), (-11.3388347648, 6.3388347648))
        make_face()
        Polygon((-11.3388347648, 6.3388347648), (-8.8388347762, 8.8388347535), (-11.3388347648, 11.3388347648), align=None)
        with BuildLine():
            Line((-6.3388347648, 6.3388347648), (-6.3388347648, 10.7735404498))
            ThreePointArc((-6.3388347648, 10.7735404498), (-7.6502408267, 9.8855356604), (-8.8388347762, 8.8388347535))
            Line((-8.8388347648, 8.8388347648), (-6.3388347648, 6.3388347648))
        make_face()
        Polygon((-8.8388347762, 8.8388347535), (-6.3388347648, 11.3388347648), (-11.3388347648, 11.3388347648), align=None)
        with BuildLine():
            ThreePointArc((-8.8388347762, 8.8388347535), (-7.6502408267, 9.8855356604), (-6.3388347648, 10.7735404498))
            Line((-6.3388347648, 10.7735404498), (-6.3388347648, 11.3388347648))
            Line((-6.3388347648, 11.3388347648), (-8.8388347762, 8.8388347535))
        make_face()
        Polygon((17.6776695297, 17.6776695297), (15.1776695297, 15.1776695297), (20.1776695297, 15.1776695297), align=None)
        Polygon((20.1776695297, 20.1776695297), (17.6776695297, 17.6776695297), (20.1776695297, 15.1776695297), align=None)
        Polygon((15.1776695297, 20.1776695297), (17.6776695297, 17.6776695297), (20.1776695297, 20.1776695297), align=None)
        Polygon((15.1776695297, 20.1776695297), (15.1776695297, 15.1776695297), (17.6776695297, 17.6776695297), align=None)
        Polygon((-20.1776695297, 15.1776695297), (-15.1776695297, 15.1776695297), (-17.6776695297, 17.6776695297), align=None)
        Polygon((-20.1776695297, 20.1776695297), (-20.1776695297, 15.1776695297), (-17.6776695297, 17.6776695297), align=None)
        Polygon((-17.6776695297, 17.6776695297), (-15.1776695297, 15.1776695297), (-15.1776695297, 20.1776695297), align=None)
        Polygon((-17.6776695297, 17.6776695297), (-15.1776695297, 20.1776695297), (-20.1776695297, 20.1776695297), align=None)
        Polygon((-2.5, 22.5), (0, 25), (-2.5, 27.5), align=None)
        Polygon((-2.5, 27.5), (0, 25), (2.5, 27.5), align=None)
        Polygon((2.5, 27.5), (0, 25), (2.5, 22.5), align=None)
        Polygon((0, 25), (0, 22.5), (2.5, 22.5), align=None)
        Polygon((-2.5, 22.5), (0, 22.5), (0, 25), align=None)
    extrude(amount=F4_DEPTH, taper=F4_TAPER)

    # F5 (radius 1 in the source; OpenCascade refuses exactly that, so slightly less here)
    f5_edges = [f1.edges().sort_by_distance(p)[0] for p in [
        (-31, 0, 20),
    ]]
    fillet(f5_edges, radius=F5_R)

    # F6 (add): a face of the model
    f6_faces = [f1.faces().sort_by_distance(p)[0] for p in [
        (0, 0, 1),
    ]]
    extrude(f6_faces, amount=F6_DEPTH)


solid = f1.part
